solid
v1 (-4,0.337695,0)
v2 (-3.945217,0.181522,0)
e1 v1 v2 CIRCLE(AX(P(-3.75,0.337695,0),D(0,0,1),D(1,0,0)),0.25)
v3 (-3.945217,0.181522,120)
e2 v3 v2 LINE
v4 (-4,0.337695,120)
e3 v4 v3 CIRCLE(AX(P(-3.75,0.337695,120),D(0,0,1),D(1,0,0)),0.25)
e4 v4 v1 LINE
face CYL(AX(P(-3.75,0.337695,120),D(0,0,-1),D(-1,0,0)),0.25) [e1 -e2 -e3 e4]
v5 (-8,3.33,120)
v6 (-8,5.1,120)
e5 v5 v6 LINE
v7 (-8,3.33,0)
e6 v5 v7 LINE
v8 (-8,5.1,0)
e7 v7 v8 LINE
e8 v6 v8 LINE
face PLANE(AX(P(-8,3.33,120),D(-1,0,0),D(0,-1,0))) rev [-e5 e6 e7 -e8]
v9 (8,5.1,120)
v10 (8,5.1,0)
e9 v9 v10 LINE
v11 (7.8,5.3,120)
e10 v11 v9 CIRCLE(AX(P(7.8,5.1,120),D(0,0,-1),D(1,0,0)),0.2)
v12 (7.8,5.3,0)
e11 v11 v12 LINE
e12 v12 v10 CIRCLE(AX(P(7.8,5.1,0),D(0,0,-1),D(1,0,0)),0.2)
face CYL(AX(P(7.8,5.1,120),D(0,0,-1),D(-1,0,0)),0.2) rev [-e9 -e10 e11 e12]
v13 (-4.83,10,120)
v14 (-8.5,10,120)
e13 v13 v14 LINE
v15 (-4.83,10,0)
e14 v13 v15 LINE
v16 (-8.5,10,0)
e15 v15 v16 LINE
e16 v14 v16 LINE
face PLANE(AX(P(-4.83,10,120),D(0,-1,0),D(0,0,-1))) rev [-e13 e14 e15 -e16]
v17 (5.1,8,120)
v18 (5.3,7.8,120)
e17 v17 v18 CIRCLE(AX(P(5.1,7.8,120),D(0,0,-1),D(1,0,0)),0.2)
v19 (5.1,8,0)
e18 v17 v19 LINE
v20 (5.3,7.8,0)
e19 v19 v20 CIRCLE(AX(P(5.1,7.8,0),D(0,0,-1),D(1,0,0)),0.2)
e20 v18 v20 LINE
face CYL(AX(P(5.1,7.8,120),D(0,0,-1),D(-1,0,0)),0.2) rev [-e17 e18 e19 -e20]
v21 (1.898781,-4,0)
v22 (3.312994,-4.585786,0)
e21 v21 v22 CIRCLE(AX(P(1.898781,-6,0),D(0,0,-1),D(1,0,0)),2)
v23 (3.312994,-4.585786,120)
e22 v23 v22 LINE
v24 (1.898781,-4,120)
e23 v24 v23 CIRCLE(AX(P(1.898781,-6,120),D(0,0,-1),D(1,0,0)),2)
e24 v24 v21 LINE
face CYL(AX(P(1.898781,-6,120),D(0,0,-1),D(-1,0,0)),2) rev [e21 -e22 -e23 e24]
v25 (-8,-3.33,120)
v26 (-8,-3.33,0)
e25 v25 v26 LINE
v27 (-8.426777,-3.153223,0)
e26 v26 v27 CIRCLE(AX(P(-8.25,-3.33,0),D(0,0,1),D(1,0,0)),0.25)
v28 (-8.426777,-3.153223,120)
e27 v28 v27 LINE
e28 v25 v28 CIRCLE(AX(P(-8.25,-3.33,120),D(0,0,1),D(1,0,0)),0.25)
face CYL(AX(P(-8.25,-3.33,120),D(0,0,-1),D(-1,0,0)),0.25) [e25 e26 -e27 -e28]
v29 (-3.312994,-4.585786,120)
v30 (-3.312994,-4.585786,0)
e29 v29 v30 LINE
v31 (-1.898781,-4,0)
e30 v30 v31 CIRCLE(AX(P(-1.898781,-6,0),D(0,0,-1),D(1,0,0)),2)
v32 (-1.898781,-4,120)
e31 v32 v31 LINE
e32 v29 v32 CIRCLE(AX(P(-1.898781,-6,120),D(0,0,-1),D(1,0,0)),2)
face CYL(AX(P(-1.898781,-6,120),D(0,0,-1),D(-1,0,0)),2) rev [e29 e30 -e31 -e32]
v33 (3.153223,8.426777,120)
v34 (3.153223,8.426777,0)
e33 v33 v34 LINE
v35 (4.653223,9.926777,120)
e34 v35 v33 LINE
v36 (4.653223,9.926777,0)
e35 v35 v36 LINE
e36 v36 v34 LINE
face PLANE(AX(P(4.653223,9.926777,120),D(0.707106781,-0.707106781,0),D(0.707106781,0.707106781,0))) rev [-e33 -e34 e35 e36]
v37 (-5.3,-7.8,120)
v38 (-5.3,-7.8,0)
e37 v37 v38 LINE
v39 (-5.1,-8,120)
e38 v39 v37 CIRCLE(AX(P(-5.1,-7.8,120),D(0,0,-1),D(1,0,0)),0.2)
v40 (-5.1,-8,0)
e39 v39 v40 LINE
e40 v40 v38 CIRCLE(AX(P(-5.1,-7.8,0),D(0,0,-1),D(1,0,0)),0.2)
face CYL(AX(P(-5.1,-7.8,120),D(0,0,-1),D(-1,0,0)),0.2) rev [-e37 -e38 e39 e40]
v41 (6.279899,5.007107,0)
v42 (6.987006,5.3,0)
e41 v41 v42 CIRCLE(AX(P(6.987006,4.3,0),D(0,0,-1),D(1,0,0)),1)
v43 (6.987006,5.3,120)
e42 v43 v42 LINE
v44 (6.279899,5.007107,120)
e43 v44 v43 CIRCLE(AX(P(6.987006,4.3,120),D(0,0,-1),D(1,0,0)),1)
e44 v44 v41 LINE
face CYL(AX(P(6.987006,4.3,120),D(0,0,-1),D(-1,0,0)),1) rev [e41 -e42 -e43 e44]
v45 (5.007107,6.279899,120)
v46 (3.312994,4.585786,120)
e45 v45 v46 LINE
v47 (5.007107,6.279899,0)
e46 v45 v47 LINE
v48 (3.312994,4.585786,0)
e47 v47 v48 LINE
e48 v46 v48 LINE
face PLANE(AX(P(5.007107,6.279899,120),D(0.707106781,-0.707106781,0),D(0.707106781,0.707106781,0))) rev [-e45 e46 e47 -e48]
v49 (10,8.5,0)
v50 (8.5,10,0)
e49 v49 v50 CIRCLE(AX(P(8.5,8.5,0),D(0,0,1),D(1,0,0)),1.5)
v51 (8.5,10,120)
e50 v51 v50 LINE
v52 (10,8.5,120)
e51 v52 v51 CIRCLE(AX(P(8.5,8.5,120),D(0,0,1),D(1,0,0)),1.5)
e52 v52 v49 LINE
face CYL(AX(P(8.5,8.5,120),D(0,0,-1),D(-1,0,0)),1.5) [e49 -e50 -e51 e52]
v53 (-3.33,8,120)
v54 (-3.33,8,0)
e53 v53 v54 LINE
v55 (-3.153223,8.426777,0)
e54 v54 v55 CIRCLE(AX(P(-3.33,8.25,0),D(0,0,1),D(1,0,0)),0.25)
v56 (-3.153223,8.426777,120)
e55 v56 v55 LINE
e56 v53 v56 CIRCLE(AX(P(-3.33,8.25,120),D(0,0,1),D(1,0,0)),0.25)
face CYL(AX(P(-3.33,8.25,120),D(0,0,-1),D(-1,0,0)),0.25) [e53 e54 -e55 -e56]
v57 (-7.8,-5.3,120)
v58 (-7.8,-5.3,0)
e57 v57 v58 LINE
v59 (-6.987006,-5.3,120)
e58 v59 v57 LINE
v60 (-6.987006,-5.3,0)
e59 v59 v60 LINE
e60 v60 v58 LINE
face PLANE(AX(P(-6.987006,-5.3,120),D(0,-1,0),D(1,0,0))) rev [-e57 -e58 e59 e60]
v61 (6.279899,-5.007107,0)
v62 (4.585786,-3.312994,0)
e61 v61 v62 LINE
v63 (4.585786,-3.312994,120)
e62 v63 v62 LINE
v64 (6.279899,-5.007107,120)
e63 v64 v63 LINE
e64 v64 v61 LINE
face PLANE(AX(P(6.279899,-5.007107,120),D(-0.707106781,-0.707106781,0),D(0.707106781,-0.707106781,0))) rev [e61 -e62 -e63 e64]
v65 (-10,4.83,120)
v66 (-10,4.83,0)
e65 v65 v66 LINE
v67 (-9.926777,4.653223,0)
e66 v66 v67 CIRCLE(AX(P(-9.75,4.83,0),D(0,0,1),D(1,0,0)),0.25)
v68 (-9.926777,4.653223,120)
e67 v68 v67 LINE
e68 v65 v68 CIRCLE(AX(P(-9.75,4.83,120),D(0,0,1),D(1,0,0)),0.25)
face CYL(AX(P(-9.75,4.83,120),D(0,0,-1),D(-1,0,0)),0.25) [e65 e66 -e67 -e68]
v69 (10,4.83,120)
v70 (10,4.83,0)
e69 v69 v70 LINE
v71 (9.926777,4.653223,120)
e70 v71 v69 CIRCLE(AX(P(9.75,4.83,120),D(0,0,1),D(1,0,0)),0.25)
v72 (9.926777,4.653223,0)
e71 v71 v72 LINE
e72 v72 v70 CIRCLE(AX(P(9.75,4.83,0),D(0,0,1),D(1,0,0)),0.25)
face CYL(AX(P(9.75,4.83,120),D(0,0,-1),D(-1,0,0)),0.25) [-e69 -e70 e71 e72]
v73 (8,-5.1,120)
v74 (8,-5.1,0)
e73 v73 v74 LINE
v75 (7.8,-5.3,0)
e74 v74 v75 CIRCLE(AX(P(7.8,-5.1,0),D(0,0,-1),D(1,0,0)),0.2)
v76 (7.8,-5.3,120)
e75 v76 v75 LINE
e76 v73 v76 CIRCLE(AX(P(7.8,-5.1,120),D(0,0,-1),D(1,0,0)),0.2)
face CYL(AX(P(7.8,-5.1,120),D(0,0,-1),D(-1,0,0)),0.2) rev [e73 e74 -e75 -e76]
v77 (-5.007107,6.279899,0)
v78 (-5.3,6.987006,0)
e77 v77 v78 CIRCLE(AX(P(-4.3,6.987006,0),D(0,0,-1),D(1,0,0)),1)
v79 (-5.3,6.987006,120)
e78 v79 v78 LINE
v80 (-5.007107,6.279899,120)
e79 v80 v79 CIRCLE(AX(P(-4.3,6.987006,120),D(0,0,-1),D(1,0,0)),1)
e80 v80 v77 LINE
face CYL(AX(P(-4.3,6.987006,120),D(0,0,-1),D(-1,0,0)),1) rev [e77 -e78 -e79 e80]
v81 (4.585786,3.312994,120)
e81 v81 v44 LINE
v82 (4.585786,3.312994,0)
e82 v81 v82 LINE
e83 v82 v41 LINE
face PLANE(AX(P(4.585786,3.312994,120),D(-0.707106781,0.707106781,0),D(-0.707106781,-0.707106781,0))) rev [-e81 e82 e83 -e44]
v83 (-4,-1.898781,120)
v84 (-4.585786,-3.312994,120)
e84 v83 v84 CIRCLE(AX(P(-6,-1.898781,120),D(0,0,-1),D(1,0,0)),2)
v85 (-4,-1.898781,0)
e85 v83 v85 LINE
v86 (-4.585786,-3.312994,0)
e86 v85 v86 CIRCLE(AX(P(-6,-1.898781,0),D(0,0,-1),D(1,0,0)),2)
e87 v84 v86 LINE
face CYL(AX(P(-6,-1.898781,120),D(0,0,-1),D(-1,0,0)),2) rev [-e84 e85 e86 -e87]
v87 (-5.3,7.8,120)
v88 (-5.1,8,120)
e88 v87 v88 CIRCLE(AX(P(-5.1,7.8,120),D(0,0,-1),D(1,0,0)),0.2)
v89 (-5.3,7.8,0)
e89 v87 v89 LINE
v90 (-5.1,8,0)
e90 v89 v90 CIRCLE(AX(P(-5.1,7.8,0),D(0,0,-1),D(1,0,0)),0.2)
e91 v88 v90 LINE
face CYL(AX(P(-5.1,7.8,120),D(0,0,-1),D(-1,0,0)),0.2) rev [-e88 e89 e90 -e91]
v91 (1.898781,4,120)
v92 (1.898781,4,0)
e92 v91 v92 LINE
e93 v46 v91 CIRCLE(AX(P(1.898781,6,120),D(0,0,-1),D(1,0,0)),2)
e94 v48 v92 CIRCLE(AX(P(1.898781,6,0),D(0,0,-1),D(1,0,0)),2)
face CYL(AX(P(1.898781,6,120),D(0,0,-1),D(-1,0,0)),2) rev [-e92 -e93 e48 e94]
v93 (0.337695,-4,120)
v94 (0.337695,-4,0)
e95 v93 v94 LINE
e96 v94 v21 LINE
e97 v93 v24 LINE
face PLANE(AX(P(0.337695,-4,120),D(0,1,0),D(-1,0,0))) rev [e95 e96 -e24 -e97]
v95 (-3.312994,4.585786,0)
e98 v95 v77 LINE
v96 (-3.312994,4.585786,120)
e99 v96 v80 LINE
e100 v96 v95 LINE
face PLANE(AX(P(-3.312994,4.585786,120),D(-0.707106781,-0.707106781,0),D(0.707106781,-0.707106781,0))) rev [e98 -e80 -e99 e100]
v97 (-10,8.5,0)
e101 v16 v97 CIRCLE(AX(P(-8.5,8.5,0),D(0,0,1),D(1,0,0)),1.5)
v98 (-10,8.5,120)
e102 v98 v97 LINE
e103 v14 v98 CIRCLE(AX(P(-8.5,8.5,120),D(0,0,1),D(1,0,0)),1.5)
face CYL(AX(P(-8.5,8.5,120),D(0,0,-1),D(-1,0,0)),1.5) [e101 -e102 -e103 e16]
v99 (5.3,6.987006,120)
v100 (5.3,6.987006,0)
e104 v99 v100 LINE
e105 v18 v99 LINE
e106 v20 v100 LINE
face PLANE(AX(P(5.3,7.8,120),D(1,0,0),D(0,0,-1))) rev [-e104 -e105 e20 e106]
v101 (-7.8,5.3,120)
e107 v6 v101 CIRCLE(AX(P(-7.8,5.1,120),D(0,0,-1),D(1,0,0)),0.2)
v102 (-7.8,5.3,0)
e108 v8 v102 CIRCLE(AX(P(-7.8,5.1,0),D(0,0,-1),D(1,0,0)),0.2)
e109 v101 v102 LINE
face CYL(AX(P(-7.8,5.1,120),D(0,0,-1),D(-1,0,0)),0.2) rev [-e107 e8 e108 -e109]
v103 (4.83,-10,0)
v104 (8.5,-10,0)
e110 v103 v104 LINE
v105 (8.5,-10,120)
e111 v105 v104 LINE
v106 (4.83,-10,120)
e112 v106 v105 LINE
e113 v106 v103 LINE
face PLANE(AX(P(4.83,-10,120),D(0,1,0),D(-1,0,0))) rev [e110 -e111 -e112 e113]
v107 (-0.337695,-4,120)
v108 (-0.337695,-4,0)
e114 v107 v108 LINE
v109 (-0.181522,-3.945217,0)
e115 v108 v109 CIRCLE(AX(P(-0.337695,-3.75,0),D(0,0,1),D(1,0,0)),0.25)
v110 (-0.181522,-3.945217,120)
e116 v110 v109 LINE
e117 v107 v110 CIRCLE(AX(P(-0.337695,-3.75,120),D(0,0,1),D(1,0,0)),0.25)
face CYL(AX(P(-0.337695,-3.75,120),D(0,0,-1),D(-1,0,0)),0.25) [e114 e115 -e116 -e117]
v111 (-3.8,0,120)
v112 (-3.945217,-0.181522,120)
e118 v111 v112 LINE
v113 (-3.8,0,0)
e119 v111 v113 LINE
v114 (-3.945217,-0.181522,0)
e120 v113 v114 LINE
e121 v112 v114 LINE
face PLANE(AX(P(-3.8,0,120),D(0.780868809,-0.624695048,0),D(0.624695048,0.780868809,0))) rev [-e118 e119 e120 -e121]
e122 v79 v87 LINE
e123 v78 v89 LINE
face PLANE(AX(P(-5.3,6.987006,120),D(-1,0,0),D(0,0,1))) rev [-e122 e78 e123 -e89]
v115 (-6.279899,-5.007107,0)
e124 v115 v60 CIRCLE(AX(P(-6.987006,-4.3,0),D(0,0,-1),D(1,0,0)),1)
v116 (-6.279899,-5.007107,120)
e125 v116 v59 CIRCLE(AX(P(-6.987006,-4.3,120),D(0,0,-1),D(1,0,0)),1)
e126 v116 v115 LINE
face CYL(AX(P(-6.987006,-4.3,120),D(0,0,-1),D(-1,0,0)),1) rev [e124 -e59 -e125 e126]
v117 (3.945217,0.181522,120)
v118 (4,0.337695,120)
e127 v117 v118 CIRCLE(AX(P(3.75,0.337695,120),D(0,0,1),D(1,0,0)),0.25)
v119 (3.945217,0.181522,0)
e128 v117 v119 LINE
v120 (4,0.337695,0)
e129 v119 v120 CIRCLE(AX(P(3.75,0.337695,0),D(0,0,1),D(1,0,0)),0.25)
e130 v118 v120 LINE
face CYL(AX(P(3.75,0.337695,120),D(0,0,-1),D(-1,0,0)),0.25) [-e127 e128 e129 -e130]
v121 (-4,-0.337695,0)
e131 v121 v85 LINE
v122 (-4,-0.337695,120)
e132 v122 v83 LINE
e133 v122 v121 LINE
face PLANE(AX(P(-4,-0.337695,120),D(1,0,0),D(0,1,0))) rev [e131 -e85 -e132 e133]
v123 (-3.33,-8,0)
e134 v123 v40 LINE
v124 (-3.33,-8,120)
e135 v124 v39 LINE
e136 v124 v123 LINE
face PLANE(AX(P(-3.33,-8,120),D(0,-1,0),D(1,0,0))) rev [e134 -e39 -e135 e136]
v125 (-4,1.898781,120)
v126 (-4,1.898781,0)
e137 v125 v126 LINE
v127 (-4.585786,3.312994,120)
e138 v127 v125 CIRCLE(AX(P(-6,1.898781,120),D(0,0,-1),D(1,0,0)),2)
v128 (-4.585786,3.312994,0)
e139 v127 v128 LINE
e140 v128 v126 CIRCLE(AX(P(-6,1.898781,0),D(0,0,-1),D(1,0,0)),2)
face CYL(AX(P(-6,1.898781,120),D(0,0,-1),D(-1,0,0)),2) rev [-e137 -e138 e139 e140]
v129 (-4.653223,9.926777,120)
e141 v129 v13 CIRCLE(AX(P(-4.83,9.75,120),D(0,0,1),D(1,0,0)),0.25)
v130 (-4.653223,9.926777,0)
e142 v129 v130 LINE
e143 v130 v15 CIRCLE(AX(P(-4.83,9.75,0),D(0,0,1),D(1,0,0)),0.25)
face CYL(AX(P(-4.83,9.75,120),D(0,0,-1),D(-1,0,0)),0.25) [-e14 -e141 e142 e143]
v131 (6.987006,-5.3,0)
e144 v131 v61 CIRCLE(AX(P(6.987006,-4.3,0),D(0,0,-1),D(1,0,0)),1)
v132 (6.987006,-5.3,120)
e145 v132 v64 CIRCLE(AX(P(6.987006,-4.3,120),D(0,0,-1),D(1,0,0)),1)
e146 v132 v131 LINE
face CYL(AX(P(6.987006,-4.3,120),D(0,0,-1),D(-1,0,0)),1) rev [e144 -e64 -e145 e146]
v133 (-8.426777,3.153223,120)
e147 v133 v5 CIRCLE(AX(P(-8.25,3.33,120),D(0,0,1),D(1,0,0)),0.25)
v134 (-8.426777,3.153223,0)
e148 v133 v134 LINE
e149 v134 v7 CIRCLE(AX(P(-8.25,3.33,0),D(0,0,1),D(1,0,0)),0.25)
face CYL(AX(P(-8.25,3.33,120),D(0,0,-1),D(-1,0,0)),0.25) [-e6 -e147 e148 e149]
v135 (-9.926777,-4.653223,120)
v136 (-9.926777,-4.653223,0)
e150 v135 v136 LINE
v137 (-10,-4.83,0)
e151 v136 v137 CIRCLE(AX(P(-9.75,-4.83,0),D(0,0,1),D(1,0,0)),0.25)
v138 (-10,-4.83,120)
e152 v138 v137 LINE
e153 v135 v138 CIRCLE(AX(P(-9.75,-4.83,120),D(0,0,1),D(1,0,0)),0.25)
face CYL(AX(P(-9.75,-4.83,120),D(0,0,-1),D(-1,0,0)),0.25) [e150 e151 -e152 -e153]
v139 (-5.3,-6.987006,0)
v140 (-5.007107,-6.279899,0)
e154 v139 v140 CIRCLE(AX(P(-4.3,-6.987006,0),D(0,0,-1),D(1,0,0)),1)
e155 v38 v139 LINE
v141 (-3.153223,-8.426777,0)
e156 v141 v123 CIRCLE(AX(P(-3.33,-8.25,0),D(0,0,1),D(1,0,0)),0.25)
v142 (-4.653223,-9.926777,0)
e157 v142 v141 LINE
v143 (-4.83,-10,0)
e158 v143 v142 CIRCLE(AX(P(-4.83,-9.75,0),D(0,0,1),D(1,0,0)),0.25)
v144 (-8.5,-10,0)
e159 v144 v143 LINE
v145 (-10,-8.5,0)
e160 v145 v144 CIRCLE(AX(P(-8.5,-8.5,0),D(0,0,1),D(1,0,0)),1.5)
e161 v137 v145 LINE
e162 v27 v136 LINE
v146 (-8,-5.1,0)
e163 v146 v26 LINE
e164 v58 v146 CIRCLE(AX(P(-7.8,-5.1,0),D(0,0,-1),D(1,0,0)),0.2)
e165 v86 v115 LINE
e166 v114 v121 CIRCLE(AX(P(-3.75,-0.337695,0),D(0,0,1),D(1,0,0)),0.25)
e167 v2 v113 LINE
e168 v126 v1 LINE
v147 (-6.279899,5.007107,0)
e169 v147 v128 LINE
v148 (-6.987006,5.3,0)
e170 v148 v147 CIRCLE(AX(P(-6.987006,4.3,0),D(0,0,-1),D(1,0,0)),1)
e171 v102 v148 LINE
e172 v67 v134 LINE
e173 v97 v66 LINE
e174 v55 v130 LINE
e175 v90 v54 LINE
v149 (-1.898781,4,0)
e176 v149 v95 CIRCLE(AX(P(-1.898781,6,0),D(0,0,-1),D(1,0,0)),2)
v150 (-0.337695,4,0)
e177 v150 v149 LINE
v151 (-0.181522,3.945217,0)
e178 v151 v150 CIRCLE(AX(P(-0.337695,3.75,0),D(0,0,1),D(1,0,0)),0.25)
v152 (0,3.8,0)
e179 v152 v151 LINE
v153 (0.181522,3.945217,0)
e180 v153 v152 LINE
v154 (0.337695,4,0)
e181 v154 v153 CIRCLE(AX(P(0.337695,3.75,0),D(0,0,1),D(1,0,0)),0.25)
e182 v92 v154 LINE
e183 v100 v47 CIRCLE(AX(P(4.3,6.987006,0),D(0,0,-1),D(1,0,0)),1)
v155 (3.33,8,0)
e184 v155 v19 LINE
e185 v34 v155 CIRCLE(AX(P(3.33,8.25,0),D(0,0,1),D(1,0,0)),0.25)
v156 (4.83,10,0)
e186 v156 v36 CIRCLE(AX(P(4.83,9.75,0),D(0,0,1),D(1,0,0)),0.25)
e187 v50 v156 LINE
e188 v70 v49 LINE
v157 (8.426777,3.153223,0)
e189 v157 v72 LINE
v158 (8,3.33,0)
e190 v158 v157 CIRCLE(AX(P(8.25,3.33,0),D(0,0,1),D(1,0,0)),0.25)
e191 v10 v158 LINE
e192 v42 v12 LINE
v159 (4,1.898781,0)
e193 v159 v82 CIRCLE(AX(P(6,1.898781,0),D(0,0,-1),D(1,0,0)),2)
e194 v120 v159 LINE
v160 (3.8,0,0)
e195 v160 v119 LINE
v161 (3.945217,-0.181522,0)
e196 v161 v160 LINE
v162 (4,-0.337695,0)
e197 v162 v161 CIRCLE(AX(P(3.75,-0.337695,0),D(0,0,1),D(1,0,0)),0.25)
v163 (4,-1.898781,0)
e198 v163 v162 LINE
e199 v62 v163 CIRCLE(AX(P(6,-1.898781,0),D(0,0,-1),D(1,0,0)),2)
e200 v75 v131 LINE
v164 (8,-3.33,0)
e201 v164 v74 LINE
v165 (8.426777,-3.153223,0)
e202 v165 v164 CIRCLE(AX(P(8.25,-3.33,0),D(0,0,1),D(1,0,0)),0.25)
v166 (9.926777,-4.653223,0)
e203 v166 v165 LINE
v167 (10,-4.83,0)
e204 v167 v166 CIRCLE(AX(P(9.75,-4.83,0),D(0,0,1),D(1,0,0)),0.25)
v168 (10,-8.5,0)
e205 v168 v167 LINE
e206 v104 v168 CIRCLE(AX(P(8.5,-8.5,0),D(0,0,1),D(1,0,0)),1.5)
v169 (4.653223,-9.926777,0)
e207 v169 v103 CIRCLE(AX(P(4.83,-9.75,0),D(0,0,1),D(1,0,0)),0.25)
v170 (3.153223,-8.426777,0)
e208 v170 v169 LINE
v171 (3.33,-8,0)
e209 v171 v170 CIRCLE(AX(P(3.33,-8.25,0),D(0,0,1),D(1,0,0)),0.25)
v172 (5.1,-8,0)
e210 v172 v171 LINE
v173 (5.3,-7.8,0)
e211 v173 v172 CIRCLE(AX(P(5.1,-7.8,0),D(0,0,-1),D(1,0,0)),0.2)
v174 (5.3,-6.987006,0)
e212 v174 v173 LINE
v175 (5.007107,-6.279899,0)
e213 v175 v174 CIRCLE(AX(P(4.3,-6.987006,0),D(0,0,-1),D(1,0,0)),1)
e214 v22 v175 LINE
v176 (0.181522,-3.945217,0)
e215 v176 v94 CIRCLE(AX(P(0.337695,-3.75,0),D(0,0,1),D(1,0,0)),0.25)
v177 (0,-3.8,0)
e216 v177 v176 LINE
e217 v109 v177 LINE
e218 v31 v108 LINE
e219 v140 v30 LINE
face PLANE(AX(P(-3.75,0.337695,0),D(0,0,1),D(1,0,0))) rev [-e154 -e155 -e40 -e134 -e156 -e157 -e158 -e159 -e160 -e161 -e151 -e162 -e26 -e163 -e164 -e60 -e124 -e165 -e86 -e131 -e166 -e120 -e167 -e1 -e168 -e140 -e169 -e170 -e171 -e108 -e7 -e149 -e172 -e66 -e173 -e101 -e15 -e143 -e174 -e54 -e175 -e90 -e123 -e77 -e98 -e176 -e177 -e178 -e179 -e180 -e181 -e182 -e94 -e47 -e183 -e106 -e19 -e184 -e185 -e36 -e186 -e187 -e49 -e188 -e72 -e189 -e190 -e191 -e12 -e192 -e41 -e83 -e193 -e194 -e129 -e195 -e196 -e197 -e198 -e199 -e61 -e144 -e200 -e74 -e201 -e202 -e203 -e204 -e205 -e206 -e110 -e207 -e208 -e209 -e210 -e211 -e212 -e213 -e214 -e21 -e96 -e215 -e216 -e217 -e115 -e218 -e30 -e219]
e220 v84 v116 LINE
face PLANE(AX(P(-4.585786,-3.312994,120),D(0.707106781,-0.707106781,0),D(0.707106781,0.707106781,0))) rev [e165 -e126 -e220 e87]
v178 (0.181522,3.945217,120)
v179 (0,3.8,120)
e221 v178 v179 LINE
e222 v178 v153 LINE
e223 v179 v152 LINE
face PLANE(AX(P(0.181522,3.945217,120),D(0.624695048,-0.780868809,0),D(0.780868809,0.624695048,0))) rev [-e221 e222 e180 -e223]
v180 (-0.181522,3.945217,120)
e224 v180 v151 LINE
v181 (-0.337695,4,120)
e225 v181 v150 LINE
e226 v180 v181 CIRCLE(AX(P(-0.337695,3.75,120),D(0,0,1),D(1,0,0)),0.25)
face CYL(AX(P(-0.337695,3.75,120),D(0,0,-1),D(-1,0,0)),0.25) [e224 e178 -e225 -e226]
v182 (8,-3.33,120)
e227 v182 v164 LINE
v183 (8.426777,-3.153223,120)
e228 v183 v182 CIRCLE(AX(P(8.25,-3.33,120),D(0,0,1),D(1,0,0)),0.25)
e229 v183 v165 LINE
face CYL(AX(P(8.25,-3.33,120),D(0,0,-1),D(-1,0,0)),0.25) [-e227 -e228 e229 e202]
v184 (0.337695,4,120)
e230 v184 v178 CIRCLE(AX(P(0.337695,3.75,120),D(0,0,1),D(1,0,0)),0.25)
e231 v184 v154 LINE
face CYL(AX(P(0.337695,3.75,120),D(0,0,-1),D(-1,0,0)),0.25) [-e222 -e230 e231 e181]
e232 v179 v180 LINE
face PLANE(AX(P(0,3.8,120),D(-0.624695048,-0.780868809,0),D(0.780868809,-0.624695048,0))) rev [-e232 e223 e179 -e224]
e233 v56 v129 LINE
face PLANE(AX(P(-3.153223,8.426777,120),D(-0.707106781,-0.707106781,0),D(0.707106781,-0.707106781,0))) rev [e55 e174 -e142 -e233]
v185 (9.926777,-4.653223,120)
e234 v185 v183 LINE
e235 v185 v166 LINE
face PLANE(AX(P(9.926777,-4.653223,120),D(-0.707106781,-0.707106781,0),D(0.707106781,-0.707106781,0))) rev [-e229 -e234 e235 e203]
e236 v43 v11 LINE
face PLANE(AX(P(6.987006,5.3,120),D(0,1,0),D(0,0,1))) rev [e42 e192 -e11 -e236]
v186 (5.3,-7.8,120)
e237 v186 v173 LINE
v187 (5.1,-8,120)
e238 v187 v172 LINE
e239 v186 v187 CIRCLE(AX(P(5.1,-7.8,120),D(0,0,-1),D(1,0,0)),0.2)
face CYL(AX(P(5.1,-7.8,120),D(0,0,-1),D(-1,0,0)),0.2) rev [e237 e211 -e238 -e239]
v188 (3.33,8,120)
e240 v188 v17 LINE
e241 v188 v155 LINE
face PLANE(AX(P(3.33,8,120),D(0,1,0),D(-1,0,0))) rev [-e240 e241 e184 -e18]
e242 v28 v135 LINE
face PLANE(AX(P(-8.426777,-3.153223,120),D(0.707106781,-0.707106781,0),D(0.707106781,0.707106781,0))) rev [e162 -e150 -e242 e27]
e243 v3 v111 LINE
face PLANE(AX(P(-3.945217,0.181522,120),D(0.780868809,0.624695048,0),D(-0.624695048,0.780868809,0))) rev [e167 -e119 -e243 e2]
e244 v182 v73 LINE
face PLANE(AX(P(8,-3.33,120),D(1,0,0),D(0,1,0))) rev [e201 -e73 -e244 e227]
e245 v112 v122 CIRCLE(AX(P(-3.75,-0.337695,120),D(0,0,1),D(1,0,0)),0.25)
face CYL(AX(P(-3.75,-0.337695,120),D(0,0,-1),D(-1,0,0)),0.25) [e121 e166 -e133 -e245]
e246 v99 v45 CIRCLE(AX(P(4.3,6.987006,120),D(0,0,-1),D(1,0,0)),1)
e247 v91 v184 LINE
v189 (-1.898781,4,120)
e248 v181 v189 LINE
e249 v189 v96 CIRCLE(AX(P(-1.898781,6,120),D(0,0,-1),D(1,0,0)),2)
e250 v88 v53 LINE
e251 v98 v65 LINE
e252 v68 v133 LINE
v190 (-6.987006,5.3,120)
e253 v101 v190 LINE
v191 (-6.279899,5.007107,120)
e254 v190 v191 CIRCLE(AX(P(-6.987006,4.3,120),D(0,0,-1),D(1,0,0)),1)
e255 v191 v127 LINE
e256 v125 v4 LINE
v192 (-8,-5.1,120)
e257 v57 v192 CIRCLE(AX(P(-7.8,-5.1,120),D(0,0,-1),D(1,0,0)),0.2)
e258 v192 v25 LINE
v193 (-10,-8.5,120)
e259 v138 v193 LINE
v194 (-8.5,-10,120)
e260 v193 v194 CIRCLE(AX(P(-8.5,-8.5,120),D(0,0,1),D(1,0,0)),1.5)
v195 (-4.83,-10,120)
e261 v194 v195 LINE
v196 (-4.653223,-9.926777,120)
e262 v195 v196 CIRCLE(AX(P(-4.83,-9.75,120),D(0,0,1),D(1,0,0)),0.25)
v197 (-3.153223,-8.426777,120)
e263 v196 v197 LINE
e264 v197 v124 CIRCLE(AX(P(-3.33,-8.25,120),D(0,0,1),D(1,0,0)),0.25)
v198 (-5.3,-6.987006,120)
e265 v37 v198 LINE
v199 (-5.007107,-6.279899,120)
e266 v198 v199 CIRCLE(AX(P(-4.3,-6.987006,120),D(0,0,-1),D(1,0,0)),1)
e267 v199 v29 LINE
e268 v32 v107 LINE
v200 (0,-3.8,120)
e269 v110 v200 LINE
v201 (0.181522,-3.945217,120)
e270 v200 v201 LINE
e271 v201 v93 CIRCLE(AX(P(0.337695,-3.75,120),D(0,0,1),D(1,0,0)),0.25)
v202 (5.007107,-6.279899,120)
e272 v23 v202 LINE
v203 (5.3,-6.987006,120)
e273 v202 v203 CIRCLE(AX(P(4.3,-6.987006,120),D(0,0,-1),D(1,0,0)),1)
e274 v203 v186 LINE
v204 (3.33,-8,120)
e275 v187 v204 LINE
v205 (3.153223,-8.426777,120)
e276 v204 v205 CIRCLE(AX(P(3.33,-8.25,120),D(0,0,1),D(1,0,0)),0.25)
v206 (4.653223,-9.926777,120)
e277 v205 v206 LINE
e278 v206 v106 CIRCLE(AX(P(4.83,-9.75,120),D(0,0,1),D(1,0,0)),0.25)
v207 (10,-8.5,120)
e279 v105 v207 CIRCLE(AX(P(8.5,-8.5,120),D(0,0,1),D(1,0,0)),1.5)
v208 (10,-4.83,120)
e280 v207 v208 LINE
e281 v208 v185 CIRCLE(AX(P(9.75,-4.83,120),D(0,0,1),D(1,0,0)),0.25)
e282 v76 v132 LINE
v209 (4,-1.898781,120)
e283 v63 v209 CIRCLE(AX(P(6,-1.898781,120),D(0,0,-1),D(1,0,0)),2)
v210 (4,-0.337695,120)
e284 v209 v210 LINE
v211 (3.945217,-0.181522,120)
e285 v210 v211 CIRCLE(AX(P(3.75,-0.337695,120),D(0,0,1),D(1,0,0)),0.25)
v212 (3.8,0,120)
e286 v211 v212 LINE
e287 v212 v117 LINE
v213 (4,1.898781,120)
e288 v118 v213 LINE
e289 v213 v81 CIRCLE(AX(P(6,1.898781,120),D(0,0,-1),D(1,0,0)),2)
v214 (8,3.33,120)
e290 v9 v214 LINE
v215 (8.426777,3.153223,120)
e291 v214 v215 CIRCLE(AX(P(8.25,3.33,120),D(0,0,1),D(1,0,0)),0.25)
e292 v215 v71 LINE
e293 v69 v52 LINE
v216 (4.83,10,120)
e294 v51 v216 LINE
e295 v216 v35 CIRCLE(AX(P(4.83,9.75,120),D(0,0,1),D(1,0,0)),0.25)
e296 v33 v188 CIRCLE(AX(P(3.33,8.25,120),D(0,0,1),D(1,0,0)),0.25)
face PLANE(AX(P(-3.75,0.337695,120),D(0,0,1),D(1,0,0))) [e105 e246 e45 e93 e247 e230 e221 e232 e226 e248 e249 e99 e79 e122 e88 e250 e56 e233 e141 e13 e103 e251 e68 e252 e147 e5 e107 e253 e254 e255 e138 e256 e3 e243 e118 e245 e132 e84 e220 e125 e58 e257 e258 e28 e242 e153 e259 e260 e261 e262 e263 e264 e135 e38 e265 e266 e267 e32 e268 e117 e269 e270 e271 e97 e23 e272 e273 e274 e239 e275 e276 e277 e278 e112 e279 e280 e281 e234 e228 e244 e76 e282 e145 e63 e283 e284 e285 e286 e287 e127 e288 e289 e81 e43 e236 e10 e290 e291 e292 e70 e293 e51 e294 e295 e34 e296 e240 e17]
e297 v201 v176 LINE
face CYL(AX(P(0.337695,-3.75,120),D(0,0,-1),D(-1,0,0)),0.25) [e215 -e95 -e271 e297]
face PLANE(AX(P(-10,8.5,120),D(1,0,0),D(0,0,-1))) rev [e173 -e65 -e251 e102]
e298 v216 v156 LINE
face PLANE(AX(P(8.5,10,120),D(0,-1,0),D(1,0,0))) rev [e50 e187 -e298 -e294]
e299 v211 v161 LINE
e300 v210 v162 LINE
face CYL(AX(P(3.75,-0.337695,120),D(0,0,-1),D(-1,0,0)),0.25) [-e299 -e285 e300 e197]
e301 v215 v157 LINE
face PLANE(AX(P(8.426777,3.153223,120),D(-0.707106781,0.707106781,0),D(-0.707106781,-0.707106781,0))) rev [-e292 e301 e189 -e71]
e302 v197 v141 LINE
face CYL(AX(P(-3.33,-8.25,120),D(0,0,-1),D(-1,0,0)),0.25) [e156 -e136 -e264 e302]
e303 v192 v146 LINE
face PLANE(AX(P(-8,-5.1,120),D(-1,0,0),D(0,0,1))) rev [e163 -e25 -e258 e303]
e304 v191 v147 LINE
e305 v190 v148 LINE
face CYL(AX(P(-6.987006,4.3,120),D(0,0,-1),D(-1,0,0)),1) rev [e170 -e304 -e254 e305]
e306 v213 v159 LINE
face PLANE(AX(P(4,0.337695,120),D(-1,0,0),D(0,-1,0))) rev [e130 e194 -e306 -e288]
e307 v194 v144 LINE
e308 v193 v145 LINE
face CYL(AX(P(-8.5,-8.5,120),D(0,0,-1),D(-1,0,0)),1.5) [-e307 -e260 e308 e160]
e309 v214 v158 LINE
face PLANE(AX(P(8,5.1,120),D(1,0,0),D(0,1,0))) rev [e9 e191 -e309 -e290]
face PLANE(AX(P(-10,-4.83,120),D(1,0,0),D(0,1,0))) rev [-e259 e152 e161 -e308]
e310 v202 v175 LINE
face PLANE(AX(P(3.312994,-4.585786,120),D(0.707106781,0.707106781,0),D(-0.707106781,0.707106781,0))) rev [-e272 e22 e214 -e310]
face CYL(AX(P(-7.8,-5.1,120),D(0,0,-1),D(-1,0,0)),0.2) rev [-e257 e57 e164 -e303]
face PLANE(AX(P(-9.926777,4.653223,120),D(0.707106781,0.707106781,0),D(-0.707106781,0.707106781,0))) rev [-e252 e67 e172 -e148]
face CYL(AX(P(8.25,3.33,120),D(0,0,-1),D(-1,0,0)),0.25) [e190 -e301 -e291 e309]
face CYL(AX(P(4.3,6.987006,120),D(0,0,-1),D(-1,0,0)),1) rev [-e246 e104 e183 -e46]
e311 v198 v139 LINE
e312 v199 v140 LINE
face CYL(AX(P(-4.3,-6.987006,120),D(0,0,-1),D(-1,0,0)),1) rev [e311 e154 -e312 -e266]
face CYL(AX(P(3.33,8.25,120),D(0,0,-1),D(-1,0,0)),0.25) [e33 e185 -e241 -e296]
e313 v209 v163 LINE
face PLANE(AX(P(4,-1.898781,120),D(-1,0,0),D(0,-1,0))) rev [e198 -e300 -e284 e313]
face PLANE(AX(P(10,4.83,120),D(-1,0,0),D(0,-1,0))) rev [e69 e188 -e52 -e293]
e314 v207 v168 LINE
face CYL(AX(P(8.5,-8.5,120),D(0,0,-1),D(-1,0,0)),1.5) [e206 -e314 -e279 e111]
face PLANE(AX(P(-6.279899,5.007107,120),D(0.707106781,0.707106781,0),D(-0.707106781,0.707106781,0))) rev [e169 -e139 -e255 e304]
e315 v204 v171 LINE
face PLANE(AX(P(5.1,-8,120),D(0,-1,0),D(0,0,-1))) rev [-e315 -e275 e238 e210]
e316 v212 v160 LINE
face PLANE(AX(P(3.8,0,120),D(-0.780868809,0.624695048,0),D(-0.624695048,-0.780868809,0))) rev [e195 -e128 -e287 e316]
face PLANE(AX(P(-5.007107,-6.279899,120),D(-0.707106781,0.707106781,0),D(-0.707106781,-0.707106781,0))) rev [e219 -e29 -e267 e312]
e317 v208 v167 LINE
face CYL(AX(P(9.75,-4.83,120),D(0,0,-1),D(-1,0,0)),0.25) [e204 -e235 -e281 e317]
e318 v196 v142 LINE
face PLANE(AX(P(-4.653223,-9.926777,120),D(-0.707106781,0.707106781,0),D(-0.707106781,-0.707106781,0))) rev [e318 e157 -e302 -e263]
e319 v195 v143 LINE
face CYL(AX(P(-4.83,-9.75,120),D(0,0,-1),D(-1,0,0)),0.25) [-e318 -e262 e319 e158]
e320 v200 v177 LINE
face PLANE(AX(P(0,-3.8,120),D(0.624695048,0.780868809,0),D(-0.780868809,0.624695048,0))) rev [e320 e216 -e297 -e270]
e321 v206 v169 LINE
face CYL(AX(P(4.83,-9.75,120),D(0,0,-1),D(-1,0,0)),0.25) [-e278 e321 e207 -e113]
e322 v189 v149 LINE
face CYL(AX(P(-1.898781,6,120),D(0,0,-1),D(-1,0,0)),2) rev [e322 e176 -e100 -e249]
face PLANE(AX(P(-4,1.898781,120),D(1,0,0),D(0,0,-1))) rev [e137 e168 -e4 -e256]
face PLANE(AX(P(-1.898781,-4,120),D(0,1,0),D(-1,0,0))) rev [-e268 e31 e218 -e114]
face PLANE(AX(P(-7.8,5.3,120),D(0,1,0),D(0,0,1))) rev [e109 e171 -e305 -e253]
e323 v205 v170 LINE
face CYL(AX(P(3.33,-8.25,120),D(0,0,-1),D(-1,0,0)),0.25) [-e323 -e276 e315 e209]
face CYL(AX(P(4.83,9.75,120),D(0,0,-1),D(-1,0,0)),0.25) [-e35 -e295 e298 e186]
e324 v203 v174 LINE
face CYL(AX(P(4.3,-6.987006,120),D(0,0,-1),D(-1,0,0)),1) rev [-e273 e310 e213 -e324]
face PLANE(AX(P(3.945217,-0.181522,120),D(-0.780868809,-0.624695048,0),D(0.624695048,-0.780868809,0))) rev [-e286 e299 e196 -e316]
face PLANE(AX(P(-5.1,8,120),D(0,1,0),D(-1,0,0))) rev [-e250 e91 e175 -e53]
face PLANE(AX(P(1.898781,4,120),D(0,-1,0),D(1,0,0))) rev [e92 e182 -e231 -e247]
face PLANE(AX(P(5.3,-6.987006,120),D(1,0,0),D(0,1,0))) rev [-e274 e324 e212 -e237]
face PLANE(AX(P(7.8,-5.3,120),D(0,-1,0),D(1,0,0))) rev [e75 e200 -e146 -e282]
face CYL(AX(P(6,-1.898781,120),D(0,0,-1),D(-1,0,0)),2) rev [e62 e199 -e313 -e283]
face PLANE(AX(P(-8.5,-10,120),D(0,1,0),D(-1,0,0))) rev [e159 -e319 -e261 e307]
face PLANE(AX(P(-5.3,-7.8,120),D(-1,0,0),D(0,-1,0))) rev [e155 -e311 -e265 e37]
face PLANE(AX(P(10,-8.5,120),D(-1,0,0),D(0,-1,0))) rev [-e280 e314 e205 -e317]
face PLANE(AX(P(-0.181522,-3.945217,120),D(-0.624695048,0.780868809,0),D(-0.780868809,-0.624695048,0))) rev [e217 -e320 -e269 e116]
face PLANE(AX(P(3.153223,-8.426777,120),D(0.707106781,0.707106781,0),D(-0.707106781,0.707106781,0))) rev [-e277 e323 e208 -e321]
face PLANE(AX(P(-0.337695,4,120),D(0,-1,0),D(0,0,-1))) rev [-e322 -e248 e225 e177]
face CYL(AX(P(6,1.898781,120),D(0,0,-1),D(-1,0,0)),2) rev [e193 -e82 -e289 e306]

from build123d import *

# Parameters (mm, degrees)
EXTRUDE_1_DEPTH = 120


# Read off the part's stored shape, not the designer's step: 222 Конструкционный профиль 20х20-1-surface1
with BuildPart() as part:
    # Эскиз1 → Бобышка-Вытянуть1 (new body)
    with BuildSketch(Plane.XY):
        with BuildLine():
            Line((-3.945217202, 0.181521503), (-3.8, 0))
            Line((-3.8, 0), (-3.945217202, -0.181521503))
            ThreePointArc((-3.945217202, -0.181521503), (-3.98590708, -0.254943529), (-4, -0.337695265))
            Line((-4, -0.337695265), (-4, -1.898780669))
            ThreePointArc((-4, -1.898780669), (-4.152240935, -2.664147534), (-4.585786438, -3.312994231))
            Line((-4.585786438, -3.312994231), (-6.279898987, -5.007106781))
            ThreePointArc((-6.279898987, -5.007106781), (-6.604322336, -5.223879533), (-6.987005769, -5.3))
            Line((-6.987005769, -5.3), (-7.8, -5.3))
            ThreePointArc((-7.8, -5.3), (-7.941421356, -5.241421356), (-8, -5.1))
            Line((-8, -5.1), (-8, -3.33))
            ThreePointArc((-8, -3.33), (-8.154329142, -3.099030117), (-8.426776695, -3.153223305))
            Line((-8.426776695, -3.153223305), (-9.926776695, -4.653223305))
            ThreePointArc((-9.926776695, -4.653223305), (-9.980969883, -4.734329142), (-10, -4.83))
            Line((-10, -4.83), (-10, -8.5))
            ThreePointArc((-10, -8.5), (-9.560660172, -9.560660172), (-8.5, -10))
            Line((-8.5, -10), (-4.83, -10))
            ThreePointArc((-4.83, -10), (-4.734329142, -9.980969883), (-4.653223305, -9.926776695))
            Line((-4.653223305, -9.926776695), (-3.153223305, -8.426776695))
            ThreePointArc((-3.153223305, -8.426776695), (-3.099030117, -8.154329142), (-3.33, -8))
            Line((-3.33, -8), (-5.1, -8))
            ThreePointArc((-5.1, -8), (-5.241421356, -7.941421356), (-5.3, -7.8))
            Line((-5.3, -7.8), (-5.3, -6.987005769))
            ThreePointArc((-5.3, -6.987005769), (-5.223879533, -6.604322336), (-5.007106781, -6.279898987))
            Line((-5.007106781, -6.279898987), (-3.312994231, -4.585786438))
            ThreePointArc((-3.312994231, -4.585786438), (-2.664147534, -4.152240935), (-1.898780669, -4))
            Line((-1.898780669, -4), (-0.337695265, -4))
            ThreePointArc((-0.337695265, -4), (-0.254943529, -3.98590708), (-0.181521503, -3.945217202))
            Line((-0.181521503, -3.945217202), (0, -3.8))
            Line((0, -3.8), (0.181521503, -3.945217202))
            ThreePointArc((0.181521503, -3.945217202), (0.254943529, -3.98590708), (0.337695265, -4))
            Line((0.337695265, -4), (1.898780669, -4))
            ThreePointArc((1.898780669, -4), (2.664147534, -4.152240935), (3.312994231, -4.585786438))
            Line((3.312994231, -4.585786438), (5.007106781, -6.279898987))
            ThreePointArc((5.007106781, -6.279898987), (5.223879533, -6.604322336), (5.3, -6.987005769))
            Line((5.3, -6.987005769), (5.3, -7.8))
            ThreePointArc((5.3, -7.8), (5.241421356, -7.941421356), (5.1, -8))
            Line((5.1, -8), (3.33, -8))
            ThreePointArc((3.33, -8), (3.099030117, -8.154329142), (3.153223305, -8.426776695))
            Line((3.153223305, -8.426776695), (4.653223305, -9.926776695))
            ThreePointArc((4.653223305, -9.926776695), (4.734329142, -9.980969883), (4.83, -10))
            Line((4.83, -10), (8.5, -10))
            ThreePointArc((8.5, -10), (9.560660172, -9.560660172), (10, -8.5))
            Line((10, -8.5), (10, -4.83))
            ThreePointArc((10, -4.83), (9.980969883, -4.734329142), (9.926776695, -4.653223305))
            Line((9.926776695, -4.653223305), (8.426776695, -3.153223305))
            ThreePointArc((8.426776695, -3.153223305), (8.154329142, -3.099030117), (8, -3.33))
            Line((8, -3.33), (8, -5.1))
            ThreePointArc((8, -5.1), (7.941421356, -5.241421356), (7.8, -5.3))
            Line((7.8, -5.3), (6.987005769, -5.3))
            ThreePointArc((6.987005769, -5.3), (6.604322336, -5.223879533), (6.279898987, -5.007106781))
            Line((6.279898987, -5.007106781), (4.585786438, -3.312994231))
            ThreePointArc((4.585786438, -3.312994231), (4.152240935, -2.664147534), (4, -1.898780669))
            Line((4, -1.898780669), (4, -0.337695265))
            ThreePointArc((4, -0.337695265), (3.98590708, -0.254943529), (3.945217202, -0.181521503))
            Line((3.945217202, -0.181521503), (3.8, 0))
            Line((3.8, 0), (3.945217202, 0.181521503))
            ThreePointArc((3.945217202, 0.181521503), (3.98590708, 0.254943529), (4, 0.337695265))
            Line((4, 0.337695265), (4, 1.898780669))
            ThreePointArc((4, 1.898780669), (4.152240935, 2.664147534), (4.585786438, 3.312994231))
            Line((4.585786438, 3.312994231), (6.279898987, 5.007106781))
            ThreePointArc((6.279898987, 5.007106781), (6.604322336, 5.223879533), (6.987005769, 5.3))
            Line((6.987005769, 5.3), (7.8, 5.3))
            ThreePointArc((7.8, 5.3), (7.941421356, 5.241421356), (8, 5.1))
            Line((8, 5.1), (8, 3.33))
            ThreePointArc((8, 3.33), (8.154329142, 3.099030117), (8.426776695, 3.153223305))
            Line((8.426776695, 3.153223305), (9.926776695, 4.653223305))
            ThreePointArc((9.926776695, 4.653223305), (9.980969883, 4.734329142), (10, 4.83))
            Line((10, 4.83), (10, 8.5))
            ThreePointArc((10, 8.5), (9.560660172, 9.560660172), (8.5, 10))
            Line((8.5, 10), (4.83, 10))
            ThreePointArc((4.83, 10), (4.734329142, 9.980969883), (4.653223305, 9.926776695))
            Line((4.653223305, 9.926776695), (3.153223305, 8.426776695))
            ThreePointArc((3.153223305, 8.426776695), (3.099030117, 8.154329142), (3.33, 8))
            Line((3.33, 8), (5.1, 8))
            ThreePointArc((5.1, 8), (5.241421356, 7.941421356), (5.3, 7.8))
            Line((5.3, 7.8), (5.3, 6.987005769))
            ThreePointArc((5.3, 6.987005769), (5.223879533, 6.604322336), (5.007106781, 6.279898987))
            Line((5.007106781, 6.279898987), (3.312994231, 4.585786438))
            ThreePointArc((3.312994231, 4.585786438), (2.664147534, 4.152240935), (1.898780669, 4))
            Line((1.898780669, 4), (0.337695265, 4))
            ThreePointArc((0.337695265, 4), (0.254943529, 3.98590708), (0.181521503, 3.945217202))
            Line((0.181521503, 3.945217202), (0, 3.8))
            Line((0, 3.8), (-0.181521503, 3.945217202))
            ThreePointArc((-0.181521503, 3.945217202), (-0.254943529, 3.98590708), (-0.337695265, 4))
            Line((-0.337695265, 4), (-1.898780669, 4))
            ThreePointArc((-1.898780669, 4), (-2.664147534, 4.152240935), (-3.312994231, 4.585786438))
            Line((-3.312994231, 4.585786438), (-5.007106781, 6.279898987))
            ThreePointArc((-5.007106781, 6.279898987), (-5.223879533, 6.604322336), (-5.3, 6.987005769))
            Line((-5.3, 6.987005769), (-5.3, 7.8))
            ThreePointArc((-5.3, 7.8), (-5.241421356, 7.941421356), (-5.1, 8))
            Line((-5.1, 8), (-3.33, 8))
            ThreePointArc((-3.33, 8), (-3.099030117, 8.154329142), (-3.153223305, 8.426776695))
            Line((-3.153223305, 8.426776695), (-4.653223305, 9.926776695))
            ThreePointArc((-4.653223305, 9.926776695), (-4.734329142, 9.980969883), (-4.83, 10))
            Line((-4.83, 10), (-8.5, 10))
            ThreePointArc((-8.5, 10), (-9.560660172, 9.560660172), (-10, 8.5))
            Line((-10, 8.5), (-10, 4.83))
            ThreePointArc((-10, 4.83), (-9.980969883, 4.734329142), (-9.926776695, 4.653223305))
            Line((-9.926776695, 4.653223305), (-8.426776695, 3.153223305))
            ThreePointArc((-8.426776695, 3.153223305), (-8.154329142, 3.099030117), (-8, 3.33))
            Line((-8, 3.33), (-8, 5.1))
            ThreePointArc((-8, 5.1), (-7.941421356, 5.241421356), (-7.8, 5.3))
            Line((-7.8, 5.3), (-6.987005769, 5.3))
            ThreePointArc((-6.987005769, 5.3), (-6.604322336, 5.223879533), (-6.279898987, 5.007106781))
            Line((-6.279898987, 5.007106781), (-4.585786438, 3.312994231))
            ThreePointArc((-4.585786438, 3.312994231), (-4.152240935, 2.664147534), (-4, 1.898780669))
            Line((-4, 1.898780669), (-4, 0.337695265))
            ThreePointArc((-4, 0.337695265), (-3.98590708, 0.254943529), (-3.945217202, 0.181521503))
        make_face()
    extrude(amount=EXTRUDE_1_DEPTH)


solid = part.part
